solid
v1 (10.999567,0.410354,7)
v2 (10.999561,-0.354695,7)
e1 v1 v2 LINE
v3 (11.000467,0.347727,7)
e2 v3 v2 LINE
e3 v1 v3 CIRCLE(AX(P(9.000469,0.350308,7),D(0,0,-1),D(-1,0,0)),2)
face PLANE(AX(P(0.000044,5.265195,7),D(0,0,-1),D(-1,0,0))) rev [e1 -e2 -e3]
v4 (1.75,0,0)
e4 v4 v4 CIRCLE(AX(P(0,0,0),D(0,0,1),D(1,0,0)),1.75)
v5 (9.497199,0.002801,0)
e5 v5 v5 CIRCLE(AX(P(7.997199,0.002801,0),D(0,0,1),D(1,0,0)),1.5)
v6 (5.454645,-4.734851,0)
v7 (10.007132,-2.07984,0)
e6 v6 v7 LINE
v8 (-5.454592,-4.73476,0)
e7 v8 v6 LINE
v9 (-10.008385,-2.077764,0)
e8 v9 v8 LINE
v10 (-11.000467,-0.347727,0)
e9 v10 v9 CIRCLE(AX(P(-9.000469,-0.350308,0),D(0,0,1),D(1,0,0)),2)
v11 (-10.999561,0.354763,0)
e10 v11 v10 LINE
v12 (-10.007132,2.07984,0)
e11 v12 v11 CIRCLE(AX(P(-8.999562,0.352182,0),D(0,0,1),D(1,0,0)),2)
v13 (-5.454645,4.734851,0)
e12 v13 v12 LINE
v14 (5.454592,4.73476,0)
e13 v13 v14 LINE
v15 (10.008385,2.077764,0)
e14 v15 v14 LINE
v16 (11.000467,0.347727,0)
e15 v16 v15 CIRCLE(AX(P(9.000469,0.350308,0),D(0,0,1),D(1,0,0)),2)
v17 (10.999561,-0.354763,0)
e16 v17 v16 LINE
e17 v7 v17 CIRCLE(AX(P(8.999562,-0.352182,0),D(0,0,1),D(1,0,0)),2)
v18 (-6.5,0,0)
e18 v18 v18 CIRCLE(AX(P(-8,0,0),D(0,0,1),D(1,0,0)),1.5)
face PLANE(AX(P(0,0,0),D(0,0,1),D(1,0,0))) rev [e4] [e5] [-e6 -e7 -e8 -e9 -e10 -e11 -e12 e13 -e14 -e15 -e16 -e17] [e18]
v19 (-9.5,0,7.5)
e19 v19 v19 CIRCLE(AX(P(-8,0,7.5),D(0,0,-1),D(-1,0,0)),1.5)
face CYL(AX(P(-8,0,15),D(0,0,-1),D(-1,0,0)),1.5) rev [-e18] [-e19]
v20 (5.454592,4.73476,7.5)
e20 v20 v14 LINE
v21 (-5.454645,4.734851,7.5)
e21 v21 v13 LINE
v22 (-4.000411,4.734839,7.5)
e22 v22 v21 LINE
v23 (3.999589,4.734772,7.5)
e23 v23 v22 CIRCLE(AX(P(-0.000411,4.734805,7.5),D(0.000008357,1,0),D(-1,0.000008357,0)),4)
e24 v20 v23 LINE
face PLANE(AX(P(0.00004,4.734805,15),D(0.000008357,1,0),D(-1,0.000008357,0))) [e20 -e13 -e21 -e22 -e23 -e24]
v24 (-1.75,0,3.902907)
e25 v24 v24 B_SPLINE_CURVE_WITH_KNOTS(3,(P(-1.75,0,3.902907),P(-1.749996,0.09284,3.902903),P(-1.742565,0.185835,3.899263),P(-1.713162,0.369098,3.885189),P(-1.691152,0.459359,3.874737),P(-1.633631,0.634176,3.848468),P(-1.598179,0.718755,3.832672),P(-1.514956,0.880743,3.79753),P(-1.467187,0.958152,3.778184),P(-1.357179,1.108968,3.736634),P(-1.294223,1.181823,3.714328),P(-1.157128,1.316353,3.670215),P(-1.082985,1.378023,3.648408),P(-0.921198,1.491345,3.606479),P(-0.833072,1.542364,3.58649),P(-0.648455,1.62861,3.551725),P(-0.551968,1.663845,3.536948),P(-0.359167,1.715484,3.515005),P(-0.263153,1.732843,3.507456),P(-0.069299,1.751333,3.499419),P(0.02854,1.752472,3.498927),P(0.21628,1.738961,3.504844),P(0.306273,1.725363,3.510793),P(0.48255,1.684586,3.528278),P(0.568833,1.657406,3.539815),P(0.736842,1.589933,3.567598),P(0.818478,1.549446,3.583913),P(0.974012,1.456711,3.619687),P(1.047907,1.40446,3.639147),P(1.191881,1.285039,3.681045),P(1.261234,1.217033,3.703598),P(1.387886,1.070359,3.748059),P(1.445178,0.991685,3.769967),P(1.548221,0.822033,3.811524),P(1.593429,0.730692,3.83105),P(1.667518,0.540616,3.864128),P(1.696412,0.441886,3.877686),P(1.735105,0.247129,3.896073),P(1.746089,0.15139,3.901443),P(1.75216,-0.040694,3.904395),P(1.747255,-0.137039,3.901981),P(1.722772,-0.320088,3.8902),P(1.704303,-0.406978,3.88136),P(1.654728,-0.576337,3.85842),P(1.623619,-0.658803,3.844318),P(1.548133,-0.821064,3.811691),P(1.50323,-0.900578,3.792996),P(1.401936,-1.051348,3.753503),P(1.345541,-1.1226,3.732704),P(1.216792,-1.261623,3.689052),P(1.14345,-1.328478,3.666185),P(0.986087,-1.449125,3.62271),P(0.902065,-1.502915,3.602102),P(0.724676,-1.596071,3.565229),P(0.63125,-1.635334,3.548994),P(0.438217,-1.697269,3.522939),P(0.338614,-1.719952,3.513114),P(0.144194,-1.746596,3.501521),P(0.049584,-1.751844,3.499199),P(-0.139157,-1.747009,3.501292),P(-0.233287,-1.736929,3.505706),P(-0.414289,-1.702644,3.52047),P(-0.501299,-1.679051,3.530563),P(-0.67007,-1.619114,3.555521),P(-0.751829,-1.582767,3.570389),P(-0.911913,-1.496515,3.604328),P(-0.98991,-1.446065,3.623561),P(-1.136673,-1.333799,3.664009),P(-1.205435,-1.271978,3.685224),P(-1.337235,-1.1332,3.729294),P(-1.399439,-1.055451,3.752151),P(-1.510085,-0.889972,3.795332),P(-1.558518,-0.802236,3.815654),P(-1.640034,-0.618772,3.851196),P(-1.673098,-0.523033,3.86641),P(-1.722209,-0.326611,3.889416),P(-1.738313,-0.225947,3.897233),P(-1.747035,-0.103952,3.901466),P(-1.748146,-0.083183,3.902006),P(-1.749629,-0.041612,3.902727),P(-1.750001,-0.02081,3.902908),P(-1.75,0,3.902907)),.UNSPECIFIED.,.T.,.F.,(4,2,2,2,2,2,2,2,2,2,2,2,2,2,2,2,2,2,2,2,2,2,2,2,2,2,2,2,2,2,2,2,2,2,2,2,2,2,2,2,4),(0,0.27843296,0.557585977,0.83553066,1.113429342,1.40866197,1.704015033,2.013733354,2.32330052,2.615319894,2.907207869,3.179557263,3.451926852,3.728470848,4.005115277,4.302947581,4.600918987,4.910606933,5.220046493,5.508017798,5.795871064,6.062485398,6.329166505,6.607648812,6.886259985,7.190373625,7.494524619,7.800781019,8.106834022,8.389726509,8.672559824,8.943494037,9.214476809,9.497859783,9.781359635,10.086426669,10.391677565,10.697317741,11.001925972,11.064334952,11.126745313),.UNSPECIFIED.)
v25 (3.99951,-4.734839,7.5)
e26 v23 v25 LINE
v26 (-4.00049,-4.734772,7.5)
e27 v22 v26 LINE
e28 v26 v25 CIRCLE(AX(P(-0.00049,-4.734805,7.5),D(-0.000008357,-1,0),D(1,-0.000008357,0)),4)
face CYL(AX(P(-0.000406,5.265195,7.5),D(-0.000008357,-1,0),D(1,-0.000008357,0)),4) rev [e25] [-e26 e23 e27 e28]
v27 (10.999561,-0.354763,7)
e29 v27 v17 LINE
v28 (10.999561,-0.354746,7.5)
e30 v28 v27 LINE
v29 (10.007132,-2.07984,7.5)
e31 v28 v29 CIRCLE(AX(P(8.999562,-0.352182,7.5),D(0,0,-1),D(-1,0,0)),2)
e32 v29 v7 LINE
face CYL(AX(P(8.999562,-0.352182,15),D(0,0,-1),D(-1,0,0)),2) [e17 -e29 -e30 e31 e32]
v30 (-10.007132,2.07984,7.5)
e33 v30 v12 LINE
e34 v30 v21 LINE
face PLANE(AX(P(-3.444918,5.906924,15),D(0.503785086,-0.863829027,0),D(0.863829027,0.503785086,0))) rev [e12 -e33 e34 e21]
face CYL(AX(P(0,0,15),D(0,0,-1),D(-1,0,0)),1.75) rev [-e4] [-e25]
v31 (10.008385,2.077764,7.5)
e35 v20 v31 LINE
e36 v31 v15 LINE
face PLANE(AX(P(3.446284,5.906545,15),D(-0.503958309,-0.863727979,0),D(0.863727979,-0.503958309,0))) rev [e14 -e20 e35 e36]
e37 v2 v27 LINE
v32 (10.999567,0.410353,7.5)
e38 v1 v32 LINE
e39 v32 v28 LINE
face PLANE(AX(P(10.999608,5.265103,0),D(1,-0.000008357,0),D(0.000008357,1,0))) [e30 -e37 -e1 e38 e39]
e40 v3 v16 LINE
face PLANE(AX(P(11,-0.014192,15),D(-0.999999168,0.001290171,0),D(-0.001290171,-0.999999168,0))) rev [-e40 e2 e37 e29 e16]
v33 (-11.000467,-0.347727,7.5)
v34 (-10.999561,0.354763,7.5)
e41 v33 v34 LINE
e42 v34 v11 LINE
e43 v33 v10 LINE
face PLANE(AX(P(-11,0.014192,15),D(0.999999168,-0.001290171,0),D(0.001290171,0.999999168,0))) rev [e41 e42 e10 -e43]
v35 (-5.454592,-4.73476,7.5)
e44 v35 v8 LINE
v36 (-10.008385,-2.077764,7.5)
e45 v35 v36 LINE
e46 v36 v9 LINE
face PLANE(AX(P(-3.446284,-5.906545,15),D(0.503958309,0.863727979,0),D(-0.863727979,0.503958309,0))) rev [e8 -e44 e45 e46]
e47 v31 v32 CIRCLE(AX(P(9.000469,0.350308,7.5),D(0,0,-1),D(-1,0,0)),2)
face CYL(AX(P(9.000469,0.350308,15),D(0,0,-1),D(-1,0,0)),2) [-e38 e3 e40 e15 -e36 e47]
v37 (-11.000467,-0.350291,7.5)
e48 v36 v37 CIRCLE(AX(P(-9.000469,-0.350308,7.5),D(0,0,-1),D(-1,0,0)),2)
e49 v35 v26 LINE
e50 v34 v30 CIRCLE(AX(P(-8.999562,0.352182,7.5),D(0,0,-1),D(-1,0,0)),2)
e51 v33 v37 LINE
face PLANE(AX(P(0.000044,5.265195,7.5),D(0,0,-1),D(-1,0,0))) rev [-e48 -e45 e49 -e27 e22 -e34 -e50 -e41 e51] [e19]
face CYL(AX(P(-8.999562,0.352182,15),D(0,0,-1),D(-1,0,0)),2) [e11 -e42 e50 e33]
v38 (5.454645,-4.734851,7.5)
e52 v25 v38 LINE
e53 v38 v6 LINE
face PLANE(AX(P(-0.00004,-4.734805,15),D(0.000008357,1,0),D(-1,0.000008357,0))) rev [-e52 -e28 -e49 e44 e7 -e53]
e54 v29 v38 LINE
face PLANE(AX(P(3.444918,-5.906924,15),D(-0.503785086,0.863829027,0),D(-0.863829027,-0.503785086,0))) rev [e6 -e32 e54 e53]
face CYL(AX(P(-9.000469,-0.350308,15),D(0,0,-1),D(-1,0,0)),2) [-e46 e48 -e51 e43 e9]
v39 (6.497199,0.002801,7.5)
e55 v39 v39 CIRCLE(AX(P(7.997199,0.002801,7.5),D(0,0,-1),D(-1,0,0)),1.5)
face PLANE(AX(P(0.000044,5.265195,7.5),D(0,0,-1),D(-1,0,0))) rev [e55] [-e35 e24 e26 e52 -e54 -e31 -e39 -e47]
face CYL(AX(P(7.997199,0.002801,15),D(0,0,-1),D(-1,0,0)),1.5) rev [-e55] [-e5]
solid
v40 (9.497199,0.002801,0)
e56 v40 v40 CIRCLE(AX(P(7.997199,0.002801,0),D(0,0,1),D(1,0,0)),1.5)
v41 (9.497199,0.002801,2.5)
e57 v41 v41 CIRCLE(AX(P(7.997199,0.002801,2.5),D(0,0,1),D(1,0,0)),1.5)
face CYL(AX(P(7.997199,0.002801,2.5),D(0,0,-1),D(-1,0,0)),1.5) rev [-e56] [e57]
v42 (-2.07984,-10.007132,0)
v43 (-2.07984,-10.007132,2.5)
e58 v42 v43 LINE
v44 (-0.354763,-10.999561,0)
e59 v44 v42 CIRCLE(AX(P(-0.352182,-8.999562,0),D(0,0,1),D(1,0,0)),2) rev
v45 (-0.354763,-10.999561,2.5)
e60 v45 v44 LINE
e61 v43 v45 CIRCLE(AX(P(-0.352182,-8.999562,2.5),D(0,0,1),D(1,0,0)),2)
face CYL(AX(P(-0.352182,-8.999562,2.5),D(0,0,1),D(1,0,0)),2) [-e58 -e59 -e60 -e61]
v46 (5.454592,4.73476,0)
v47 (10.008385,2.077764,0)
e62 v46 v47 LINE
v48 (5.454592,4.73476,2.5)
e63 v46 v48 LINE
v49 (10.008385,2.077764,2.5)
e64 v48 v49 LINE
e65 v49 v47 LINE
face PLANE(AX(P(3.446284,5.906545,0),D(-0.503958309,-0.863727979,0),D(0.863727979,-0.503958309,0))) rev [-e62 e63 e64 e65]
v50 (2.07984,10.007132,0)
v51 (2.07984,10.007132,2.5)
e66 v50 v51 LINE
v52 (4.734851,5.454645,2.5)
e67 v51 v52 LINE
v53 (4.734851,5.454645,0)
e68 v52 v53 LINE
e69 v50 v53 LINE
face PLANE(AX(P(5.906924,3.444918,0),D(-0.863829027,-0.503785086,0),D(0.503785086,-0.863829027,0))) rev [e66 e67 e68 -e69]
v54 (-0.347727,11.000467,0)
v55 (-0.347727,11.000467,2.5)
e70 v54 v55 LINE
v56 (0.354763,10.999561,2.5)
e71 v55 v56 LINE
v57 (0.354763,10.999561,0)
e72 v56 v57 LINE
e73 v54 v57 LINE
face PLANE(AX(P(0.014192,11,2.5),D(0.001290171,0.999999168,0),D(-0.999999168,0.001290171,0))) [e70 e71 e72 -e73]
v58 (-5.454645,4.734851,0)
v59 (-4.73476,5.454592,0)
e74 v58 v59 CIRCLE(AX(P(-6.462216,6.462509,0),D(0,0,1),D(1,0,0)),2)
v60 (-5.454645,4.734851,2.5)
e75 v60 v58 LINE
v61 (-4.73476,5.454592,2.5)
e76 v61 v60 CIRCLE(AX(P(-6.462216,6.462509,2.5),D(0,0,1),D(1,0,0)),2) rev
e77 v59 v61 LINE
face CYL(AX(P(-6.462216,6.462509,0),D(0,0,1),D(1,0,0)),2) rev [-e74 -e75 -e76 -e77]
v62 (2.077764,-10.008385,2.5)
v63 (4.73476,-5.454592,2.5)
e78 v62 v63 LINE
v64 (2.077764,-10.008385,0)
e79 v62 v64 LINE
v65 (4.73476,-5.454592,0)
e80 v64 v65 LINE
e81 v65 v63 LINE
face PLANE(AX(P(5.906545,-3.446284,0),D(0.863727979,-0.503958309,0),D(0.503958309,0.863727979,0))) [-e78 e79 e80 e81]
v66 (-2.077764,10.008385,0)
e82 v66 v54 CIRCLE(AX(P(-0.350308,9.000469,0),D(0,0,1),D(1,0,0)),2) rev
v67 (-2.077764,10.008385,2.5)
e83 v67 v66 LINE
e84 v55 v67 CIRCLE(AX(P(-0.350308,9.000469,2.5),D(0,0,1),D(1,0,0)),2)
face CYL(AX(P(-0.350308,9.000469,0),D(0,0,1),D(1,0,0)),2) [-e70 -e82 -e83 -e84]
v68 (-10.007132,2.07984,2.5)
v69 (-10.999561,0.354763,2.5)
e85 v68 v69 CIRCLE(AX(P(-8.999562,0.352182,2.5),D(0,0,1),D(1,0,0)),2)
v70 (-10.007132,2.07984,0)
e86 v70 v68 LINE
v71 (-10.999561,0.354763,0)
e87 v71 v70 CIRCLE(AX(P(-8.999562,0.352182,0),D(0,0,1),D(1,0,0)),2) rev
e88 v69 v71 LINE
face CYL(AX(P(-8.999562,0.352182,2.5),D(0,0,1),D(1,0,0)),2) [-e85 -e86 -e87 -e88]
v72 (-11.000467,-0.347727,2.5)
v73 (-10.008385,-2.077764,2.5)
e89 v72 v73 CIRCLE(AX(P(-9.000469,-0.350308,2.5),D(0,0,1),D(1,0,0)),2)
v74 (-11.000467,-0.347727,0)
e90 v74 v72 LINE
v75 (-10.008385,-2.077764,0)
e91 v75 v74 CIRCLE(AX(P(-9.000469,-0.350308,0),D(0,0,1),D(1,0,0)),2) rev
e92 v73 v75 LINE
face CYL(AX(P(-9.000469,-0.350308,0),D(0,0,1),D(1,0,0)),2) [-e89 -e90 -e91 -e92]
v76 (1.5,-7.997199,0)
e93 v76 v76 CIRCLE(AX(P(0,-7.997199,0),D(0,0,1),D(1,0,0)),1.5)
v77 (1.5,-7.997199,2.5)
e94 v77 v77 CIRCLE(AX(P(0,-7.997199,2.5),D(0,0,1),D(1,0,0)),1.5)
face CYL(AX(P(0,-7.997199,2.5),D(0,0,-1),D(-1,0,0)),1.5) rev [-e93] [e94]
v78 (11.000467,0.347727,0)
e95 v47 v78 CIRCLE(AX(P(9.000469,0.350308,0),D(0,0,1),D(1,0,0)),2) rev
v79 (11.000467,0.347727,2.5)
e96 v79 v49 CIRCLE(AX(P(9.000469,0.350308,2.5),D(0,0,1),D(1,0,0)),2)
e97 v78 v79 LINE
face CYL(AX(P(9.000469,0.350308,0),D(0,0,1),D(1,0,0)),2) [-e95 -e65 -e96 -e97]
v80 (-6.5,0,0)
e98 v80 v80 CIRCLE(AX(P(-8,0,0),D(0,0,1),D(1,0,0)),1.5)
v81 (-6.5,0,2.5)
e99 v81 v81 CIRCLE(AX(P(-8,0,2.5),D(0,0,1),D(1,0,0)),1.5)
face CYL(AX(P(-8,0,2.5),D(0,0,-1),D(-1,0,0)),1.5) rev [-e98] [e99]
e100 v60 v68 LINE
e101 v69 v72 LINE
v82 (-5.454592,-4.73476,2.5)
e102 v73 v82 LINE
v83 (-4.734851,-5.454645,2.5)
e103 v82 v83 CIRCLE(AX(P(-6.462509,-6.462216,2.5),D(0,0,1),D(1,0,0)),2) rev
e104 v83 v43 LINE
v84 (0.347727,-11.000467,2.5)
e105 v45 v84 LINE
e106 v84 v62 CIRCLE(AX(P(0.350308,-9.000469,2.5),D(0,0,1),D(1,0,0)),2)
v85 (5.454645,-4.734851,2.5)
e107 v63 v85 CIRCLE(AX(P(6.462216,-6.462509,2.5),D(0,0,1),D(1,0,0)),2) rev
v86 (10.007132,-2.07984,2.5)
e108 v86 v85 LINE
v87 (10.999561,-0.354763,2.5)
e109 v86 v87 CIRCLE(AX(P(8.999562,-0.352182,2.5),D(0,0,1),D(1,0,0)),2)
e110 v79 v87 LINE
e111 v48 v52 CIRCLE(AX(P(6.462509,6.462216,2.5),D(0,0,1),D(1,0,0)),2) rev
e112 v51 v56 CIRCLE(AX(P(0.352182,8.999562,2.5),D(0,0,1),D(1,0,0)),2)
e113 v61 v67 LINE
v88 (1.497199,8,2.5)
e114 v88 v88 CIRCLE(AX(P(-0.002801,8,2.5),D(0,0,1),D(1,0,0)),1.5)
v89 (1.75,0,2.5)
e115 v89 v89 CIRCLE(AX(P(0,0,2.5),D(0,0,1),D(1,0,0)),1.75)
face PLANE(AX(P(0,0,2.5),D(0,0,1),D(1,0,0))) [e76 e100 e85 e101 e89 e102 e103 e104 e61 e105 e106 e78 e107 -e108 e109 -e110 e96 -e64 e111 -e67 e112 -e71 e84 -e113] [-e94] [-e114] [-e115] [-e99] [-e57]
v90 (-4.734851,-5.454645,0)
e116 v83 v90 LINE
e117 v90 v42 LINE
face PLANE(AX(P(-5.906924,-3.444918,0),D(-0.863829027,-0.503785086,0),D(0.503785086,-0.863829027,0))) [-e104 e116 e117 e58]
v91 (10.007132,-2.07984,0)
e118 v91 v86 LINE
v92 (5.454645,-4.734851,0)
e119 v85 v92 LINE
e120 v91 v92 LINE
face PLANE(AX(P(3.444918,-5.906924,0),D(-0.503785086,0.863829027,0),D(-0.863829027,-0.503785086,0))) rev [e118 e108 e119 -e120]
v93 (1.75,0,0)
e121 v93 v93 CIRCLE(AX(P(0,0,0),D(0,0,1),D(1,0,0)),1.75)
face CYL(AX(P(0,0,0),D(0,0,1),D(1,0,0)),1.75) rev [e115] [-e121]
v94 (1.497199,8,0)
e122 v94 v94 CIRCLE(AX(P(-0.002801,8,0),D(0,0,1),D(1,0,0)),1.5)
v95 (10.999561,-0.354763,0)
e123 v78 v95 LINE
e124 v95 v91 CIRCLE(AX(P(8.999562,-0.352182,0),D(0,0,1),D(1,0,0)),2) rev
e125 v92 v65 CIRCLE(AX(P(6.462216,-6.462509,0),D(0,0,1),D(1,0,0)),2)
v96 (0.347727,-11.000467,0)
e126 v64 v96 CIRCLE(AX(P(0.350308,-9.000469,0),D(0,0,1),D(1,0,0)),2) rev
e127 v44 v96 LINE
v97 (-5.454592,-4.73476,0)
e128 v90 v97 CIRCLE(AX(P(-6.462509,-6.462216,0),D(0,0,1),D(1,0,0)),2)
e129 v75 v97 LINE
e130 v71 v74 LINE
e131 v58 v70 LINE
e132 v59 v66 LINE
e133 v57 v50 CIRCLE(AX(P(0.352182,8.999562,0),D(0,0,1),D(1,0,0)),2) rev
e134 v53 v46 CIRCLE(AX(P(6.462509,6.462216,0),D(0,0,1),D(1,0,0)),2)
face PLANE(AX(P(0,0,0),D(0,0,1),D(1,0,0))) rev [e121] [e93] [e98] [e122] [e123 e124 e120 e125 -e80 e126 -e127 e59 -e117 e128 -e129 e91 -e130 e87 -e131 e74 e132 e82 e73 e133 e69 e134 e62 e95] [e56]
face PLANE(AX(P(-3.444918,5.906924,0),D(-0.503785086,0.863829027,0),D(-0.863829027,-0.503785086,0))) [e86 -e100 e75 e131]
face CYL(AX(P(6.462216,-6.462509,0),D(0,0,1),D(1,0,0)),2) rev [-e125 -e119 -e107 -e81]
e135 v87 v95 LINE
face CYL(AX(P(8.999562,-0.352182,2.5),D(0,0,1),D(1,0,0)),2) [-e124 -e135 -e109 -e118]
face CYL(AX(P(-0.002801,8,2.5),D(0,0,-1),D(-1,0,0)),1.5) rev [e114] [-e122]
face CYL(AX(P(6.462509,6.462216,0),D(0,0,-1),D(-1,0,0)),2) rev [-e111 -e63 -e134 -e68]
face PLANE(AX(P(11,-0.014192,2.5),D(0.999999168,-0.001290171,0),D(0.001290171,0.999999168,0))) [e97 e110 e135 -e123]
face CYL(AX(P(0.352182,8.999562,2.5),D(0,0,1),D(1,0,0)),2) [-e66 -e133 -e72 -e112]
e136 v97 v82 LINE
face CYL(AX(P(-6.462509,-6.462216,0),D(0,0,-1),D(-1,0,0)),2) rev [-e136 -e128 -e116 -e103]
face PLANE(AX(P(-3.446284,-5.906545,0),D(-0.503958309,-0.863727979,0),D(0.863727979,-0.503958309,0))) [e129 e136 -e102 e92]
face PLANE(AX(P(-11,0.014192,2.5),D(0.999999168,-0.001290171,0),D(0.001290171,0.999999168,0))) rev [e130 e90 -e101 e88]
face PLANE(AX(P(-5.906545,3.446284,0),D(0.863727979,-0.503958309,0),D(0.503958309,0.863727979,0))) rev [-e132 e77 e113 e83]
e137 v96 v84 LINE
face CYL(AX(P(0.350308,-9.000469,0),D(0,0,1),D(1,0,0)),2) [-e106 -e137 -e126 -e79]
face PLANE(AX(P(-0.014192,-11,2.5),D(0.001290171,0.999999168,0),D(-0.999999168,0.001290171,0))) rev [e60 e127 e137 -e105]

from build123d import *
from OCP.BRepAlgoAPI import BRepAlgoAPI_Cut
from OCP.TopTools import TopTools_ListOfShape

# Parameters (mm, degrees)
SKETCH1_R           = 1.5
BOSS_EXTRUDE1_DEPTH = 2.5
CUT_EXTRUDE1_DEPTH  = 2.5
SKETCH3_R           = 1.75
CUT_EXTRUDE2_DEPTH  = 2.5
FILLET1_R           = 2
SKETCH4_R           = 1.5
SKETCH4_R_2         = 1.75
BOSS_EXTRUDE2_DEPTH = 15
CUT_EXTRUDE3_DEPTH  = 10


with BuildPart() as part:
    # Sketch1 → Boss-Extrude1 (new body)
    with BuildSketch(Plane.XY):
        Polygon((1.501919425, 10.998080575), (-1.498048949, 11.001951051), (-10.998080575, 1.501919425), (-11.001951051, -1.498048949), (-1.501919425, -10.998080575), (1.498048949, -11.001951051), (10.998080575, -1.501919425), (11.001951051, 1.498048949), align=None)
        with Locations((-0.002801443, 8)):
            Circle(SKETCH1_R, mode=Mode.SUBTRACT)
        with Locations((7.997198557, 0.002801443)):
            Circle(SKETCH1_R, mode=Mode.SUBTRACT)
        with Locations((0, -7.997198557)):
            Circle(SKETCH1_R, mode=Mode.SUBTRACT)
        with Locations((-8, 0)):
            Circle(SKETCH1_R, mode=Mode.SUBTRACT)
    extrude(amount=BOSS_EXTRUDE1_DEPTH)

    # Sketch2 → Cut-Extrude1 (cut)
    with BuildSketch(Plane.XY.offset(2.5)):
        Polygon((-10.998080575, 1.501919425), (-5, 5), (-1.498048949, 11.001951051), align=None)
        Polygon((-1.501919425, -10.998080575), (-5, -5), (-11.001951051, -1.498048949), align=None)
        Polygon((1.501919425, 10.998080575), (5, 5), (11.001951051, 1.498048949), align=None)
        Polygon((10.998080575, -1.501919425), (5, -5), (1.498048949, -11.001951051), align=None)
    extrude(amount=-CUT_EXTRUDE1_DEPTH, mode=Mode.SUBTRACT)

    # Sketch3 → Cut-Extrude2 (cut)
    with BuildSketch(Plane.XY.offset(2.5)):
        Circle(SKETCH3_R)
    extrude(amount=-CUT_EXTRUDE2_DEPTH, mode=Mode.SUBTRACT)

    # Fillet1
    fillet1_edges = [part.edges().sort_by_distance(p)[0] for p in [
        (-10.998080575, 1.501919425, 1.25),
        (-5, 5, 1.25),
        (-1.498048949, 11.001951051, 1.25),
        (1.501919425, 10.998080575, 1.25),
        (5, 5, 1.25),
        (11.001951051, 1.498048949, 1.25),
        (10.998080575, -1.501919425, 1.25),
        (5, -5, 1.25),
        (1.498048949, -11.001951051, 1.25),
        (-1.501919425, -10.998080575, 1.25),
        (-5, -5, 1.25),
        (-11.001951051, -1.498048949, 1.25),
    ]]
    fillet(fillet1_edges, radius=FILLET1_R)


with BuildPart() as body_2:
    # Sketch4 → Boss-Extrude2 (new body)
    with BuildSketch(Plane.XY):
        with BuildLine():
            Line((5.454592231, 4.734759626), (-5.454645413, 4.734850796))
            Line((-5.454645413, 4.734850796), (-10.007132442, 2.079840374))
            ThreePointArc((-10.007132442, 2.079840374), (-10.733154021, 1.349508566), (-10.999560605, 0.354762663))
            Line((-10.999560605, 0.354762663), (-11.000466938, -0.347727289))
            ThreePointArc((-11.000466938, -0.347727289), (-10.735445402, -1.345222455), (-10.008385222, -2.07776359))
            Line((-10.008385222, -2.07776359), (-5.454592231, -4.734759626))
            Line((-5.454592231, -4.734759626), (5.454645413, -4.734850796))
            Line((5.454645413, -4.734850796), (10.007132442, -2.079840374))
            ThreePointArc((10.007132442, -2.079840374), (10.733154021, -1.349508566), (10.999560605, -0.354762663))
            Line((10.999560605, -0.354762663), (11.000466938, 0.347727289))
            ThreePointArc((11.000466938, 0.347727289), (10.735445402, 1.345222455), (10.008385222, 2.07776359))
            Line((10.008385222, 2.07776359), (5.454592231, 4.734759626))
        make_face()
        with Locations((-8, 0)):
            Circle(SKETCH4_R, mode=Mode.SUBTRACT)
        Circle(SKETCH4_R_2, mode=Mode.SUBTRACT)
        with Locations((7.997198557, 0.002801443)):
            Circle(SKETCH4_R, mode=Mode.SUBTRACT)
    extrude(amount=BOSS_EXTRUDE2_DEPTH)


with BuildPart() as cut_extrude3_tool:
    # Sketch5 → Cut-Extrude3 (new body)
    with BuildSketch(Plane(origin=(-3.9569e-05, -4.734805211, 0), x_dir=(0.9999999999650793, -8.357134608074512e-06, 0), z_dir=(-8.357134608074512e-06, -0.9999999999650793, 0))):
        with BuildLine():
            Line((-11.000464032, 7.5), (-4.000450231, 7.5))
            ThreePointArc((-4.000450231, 7.5), (-0.000450231, 3.5), (3.999549769, 7.5))
            Line((3.999549769, 7.5), (10.999563569, 7.5))
            Line((10.999563569, 7.5), (10.999563569, 7))
            Line((10.999563569, 7), (12.263859783, 7))
            Line((12.263859783, 7), (12.263859783, 16))
            Line((12.263859783, 16), (-11.000464032, 16))
            Line((-11.000464032, 16), (-11.000464032, 7.5))
        make_face()
    extrude(amount=-CUT_EXTRUDE3_DEPTH)


with BuildPart() as body_2_1:
    add(body_2.part)

    # Cut-Extrude3: cut by cut_extrude3_tool, with a tolerance
    cut_extrude3_stock = TopTools_ListOfShape()
    cut_extrude3_stock.Append(body_2_1.part.wrapped)
    cut_extrude3_tools = TopTools_ListOfShape()
    cut_extrude3_tools.Append(cut_extrude3_tool.part.wrapped)
    cut_extrude3_cut = BRepAlgoAPI_Cut()
    cut_extrude3_cut.SetArguments(cut_extrude3_stock)
    cut_extrude3_cut.SetTools(cut_extrude3_tools)
    cut_extrude3_cut.SetFuzzyValue(0.00001)
    cut_extrude3_cut.Build()
    add(Compound.cast(cut_extrude3_cut.Shape()).solids(), mode=Mode.REPLACE)


solid = Compound([part.part, body_2_1.part])
